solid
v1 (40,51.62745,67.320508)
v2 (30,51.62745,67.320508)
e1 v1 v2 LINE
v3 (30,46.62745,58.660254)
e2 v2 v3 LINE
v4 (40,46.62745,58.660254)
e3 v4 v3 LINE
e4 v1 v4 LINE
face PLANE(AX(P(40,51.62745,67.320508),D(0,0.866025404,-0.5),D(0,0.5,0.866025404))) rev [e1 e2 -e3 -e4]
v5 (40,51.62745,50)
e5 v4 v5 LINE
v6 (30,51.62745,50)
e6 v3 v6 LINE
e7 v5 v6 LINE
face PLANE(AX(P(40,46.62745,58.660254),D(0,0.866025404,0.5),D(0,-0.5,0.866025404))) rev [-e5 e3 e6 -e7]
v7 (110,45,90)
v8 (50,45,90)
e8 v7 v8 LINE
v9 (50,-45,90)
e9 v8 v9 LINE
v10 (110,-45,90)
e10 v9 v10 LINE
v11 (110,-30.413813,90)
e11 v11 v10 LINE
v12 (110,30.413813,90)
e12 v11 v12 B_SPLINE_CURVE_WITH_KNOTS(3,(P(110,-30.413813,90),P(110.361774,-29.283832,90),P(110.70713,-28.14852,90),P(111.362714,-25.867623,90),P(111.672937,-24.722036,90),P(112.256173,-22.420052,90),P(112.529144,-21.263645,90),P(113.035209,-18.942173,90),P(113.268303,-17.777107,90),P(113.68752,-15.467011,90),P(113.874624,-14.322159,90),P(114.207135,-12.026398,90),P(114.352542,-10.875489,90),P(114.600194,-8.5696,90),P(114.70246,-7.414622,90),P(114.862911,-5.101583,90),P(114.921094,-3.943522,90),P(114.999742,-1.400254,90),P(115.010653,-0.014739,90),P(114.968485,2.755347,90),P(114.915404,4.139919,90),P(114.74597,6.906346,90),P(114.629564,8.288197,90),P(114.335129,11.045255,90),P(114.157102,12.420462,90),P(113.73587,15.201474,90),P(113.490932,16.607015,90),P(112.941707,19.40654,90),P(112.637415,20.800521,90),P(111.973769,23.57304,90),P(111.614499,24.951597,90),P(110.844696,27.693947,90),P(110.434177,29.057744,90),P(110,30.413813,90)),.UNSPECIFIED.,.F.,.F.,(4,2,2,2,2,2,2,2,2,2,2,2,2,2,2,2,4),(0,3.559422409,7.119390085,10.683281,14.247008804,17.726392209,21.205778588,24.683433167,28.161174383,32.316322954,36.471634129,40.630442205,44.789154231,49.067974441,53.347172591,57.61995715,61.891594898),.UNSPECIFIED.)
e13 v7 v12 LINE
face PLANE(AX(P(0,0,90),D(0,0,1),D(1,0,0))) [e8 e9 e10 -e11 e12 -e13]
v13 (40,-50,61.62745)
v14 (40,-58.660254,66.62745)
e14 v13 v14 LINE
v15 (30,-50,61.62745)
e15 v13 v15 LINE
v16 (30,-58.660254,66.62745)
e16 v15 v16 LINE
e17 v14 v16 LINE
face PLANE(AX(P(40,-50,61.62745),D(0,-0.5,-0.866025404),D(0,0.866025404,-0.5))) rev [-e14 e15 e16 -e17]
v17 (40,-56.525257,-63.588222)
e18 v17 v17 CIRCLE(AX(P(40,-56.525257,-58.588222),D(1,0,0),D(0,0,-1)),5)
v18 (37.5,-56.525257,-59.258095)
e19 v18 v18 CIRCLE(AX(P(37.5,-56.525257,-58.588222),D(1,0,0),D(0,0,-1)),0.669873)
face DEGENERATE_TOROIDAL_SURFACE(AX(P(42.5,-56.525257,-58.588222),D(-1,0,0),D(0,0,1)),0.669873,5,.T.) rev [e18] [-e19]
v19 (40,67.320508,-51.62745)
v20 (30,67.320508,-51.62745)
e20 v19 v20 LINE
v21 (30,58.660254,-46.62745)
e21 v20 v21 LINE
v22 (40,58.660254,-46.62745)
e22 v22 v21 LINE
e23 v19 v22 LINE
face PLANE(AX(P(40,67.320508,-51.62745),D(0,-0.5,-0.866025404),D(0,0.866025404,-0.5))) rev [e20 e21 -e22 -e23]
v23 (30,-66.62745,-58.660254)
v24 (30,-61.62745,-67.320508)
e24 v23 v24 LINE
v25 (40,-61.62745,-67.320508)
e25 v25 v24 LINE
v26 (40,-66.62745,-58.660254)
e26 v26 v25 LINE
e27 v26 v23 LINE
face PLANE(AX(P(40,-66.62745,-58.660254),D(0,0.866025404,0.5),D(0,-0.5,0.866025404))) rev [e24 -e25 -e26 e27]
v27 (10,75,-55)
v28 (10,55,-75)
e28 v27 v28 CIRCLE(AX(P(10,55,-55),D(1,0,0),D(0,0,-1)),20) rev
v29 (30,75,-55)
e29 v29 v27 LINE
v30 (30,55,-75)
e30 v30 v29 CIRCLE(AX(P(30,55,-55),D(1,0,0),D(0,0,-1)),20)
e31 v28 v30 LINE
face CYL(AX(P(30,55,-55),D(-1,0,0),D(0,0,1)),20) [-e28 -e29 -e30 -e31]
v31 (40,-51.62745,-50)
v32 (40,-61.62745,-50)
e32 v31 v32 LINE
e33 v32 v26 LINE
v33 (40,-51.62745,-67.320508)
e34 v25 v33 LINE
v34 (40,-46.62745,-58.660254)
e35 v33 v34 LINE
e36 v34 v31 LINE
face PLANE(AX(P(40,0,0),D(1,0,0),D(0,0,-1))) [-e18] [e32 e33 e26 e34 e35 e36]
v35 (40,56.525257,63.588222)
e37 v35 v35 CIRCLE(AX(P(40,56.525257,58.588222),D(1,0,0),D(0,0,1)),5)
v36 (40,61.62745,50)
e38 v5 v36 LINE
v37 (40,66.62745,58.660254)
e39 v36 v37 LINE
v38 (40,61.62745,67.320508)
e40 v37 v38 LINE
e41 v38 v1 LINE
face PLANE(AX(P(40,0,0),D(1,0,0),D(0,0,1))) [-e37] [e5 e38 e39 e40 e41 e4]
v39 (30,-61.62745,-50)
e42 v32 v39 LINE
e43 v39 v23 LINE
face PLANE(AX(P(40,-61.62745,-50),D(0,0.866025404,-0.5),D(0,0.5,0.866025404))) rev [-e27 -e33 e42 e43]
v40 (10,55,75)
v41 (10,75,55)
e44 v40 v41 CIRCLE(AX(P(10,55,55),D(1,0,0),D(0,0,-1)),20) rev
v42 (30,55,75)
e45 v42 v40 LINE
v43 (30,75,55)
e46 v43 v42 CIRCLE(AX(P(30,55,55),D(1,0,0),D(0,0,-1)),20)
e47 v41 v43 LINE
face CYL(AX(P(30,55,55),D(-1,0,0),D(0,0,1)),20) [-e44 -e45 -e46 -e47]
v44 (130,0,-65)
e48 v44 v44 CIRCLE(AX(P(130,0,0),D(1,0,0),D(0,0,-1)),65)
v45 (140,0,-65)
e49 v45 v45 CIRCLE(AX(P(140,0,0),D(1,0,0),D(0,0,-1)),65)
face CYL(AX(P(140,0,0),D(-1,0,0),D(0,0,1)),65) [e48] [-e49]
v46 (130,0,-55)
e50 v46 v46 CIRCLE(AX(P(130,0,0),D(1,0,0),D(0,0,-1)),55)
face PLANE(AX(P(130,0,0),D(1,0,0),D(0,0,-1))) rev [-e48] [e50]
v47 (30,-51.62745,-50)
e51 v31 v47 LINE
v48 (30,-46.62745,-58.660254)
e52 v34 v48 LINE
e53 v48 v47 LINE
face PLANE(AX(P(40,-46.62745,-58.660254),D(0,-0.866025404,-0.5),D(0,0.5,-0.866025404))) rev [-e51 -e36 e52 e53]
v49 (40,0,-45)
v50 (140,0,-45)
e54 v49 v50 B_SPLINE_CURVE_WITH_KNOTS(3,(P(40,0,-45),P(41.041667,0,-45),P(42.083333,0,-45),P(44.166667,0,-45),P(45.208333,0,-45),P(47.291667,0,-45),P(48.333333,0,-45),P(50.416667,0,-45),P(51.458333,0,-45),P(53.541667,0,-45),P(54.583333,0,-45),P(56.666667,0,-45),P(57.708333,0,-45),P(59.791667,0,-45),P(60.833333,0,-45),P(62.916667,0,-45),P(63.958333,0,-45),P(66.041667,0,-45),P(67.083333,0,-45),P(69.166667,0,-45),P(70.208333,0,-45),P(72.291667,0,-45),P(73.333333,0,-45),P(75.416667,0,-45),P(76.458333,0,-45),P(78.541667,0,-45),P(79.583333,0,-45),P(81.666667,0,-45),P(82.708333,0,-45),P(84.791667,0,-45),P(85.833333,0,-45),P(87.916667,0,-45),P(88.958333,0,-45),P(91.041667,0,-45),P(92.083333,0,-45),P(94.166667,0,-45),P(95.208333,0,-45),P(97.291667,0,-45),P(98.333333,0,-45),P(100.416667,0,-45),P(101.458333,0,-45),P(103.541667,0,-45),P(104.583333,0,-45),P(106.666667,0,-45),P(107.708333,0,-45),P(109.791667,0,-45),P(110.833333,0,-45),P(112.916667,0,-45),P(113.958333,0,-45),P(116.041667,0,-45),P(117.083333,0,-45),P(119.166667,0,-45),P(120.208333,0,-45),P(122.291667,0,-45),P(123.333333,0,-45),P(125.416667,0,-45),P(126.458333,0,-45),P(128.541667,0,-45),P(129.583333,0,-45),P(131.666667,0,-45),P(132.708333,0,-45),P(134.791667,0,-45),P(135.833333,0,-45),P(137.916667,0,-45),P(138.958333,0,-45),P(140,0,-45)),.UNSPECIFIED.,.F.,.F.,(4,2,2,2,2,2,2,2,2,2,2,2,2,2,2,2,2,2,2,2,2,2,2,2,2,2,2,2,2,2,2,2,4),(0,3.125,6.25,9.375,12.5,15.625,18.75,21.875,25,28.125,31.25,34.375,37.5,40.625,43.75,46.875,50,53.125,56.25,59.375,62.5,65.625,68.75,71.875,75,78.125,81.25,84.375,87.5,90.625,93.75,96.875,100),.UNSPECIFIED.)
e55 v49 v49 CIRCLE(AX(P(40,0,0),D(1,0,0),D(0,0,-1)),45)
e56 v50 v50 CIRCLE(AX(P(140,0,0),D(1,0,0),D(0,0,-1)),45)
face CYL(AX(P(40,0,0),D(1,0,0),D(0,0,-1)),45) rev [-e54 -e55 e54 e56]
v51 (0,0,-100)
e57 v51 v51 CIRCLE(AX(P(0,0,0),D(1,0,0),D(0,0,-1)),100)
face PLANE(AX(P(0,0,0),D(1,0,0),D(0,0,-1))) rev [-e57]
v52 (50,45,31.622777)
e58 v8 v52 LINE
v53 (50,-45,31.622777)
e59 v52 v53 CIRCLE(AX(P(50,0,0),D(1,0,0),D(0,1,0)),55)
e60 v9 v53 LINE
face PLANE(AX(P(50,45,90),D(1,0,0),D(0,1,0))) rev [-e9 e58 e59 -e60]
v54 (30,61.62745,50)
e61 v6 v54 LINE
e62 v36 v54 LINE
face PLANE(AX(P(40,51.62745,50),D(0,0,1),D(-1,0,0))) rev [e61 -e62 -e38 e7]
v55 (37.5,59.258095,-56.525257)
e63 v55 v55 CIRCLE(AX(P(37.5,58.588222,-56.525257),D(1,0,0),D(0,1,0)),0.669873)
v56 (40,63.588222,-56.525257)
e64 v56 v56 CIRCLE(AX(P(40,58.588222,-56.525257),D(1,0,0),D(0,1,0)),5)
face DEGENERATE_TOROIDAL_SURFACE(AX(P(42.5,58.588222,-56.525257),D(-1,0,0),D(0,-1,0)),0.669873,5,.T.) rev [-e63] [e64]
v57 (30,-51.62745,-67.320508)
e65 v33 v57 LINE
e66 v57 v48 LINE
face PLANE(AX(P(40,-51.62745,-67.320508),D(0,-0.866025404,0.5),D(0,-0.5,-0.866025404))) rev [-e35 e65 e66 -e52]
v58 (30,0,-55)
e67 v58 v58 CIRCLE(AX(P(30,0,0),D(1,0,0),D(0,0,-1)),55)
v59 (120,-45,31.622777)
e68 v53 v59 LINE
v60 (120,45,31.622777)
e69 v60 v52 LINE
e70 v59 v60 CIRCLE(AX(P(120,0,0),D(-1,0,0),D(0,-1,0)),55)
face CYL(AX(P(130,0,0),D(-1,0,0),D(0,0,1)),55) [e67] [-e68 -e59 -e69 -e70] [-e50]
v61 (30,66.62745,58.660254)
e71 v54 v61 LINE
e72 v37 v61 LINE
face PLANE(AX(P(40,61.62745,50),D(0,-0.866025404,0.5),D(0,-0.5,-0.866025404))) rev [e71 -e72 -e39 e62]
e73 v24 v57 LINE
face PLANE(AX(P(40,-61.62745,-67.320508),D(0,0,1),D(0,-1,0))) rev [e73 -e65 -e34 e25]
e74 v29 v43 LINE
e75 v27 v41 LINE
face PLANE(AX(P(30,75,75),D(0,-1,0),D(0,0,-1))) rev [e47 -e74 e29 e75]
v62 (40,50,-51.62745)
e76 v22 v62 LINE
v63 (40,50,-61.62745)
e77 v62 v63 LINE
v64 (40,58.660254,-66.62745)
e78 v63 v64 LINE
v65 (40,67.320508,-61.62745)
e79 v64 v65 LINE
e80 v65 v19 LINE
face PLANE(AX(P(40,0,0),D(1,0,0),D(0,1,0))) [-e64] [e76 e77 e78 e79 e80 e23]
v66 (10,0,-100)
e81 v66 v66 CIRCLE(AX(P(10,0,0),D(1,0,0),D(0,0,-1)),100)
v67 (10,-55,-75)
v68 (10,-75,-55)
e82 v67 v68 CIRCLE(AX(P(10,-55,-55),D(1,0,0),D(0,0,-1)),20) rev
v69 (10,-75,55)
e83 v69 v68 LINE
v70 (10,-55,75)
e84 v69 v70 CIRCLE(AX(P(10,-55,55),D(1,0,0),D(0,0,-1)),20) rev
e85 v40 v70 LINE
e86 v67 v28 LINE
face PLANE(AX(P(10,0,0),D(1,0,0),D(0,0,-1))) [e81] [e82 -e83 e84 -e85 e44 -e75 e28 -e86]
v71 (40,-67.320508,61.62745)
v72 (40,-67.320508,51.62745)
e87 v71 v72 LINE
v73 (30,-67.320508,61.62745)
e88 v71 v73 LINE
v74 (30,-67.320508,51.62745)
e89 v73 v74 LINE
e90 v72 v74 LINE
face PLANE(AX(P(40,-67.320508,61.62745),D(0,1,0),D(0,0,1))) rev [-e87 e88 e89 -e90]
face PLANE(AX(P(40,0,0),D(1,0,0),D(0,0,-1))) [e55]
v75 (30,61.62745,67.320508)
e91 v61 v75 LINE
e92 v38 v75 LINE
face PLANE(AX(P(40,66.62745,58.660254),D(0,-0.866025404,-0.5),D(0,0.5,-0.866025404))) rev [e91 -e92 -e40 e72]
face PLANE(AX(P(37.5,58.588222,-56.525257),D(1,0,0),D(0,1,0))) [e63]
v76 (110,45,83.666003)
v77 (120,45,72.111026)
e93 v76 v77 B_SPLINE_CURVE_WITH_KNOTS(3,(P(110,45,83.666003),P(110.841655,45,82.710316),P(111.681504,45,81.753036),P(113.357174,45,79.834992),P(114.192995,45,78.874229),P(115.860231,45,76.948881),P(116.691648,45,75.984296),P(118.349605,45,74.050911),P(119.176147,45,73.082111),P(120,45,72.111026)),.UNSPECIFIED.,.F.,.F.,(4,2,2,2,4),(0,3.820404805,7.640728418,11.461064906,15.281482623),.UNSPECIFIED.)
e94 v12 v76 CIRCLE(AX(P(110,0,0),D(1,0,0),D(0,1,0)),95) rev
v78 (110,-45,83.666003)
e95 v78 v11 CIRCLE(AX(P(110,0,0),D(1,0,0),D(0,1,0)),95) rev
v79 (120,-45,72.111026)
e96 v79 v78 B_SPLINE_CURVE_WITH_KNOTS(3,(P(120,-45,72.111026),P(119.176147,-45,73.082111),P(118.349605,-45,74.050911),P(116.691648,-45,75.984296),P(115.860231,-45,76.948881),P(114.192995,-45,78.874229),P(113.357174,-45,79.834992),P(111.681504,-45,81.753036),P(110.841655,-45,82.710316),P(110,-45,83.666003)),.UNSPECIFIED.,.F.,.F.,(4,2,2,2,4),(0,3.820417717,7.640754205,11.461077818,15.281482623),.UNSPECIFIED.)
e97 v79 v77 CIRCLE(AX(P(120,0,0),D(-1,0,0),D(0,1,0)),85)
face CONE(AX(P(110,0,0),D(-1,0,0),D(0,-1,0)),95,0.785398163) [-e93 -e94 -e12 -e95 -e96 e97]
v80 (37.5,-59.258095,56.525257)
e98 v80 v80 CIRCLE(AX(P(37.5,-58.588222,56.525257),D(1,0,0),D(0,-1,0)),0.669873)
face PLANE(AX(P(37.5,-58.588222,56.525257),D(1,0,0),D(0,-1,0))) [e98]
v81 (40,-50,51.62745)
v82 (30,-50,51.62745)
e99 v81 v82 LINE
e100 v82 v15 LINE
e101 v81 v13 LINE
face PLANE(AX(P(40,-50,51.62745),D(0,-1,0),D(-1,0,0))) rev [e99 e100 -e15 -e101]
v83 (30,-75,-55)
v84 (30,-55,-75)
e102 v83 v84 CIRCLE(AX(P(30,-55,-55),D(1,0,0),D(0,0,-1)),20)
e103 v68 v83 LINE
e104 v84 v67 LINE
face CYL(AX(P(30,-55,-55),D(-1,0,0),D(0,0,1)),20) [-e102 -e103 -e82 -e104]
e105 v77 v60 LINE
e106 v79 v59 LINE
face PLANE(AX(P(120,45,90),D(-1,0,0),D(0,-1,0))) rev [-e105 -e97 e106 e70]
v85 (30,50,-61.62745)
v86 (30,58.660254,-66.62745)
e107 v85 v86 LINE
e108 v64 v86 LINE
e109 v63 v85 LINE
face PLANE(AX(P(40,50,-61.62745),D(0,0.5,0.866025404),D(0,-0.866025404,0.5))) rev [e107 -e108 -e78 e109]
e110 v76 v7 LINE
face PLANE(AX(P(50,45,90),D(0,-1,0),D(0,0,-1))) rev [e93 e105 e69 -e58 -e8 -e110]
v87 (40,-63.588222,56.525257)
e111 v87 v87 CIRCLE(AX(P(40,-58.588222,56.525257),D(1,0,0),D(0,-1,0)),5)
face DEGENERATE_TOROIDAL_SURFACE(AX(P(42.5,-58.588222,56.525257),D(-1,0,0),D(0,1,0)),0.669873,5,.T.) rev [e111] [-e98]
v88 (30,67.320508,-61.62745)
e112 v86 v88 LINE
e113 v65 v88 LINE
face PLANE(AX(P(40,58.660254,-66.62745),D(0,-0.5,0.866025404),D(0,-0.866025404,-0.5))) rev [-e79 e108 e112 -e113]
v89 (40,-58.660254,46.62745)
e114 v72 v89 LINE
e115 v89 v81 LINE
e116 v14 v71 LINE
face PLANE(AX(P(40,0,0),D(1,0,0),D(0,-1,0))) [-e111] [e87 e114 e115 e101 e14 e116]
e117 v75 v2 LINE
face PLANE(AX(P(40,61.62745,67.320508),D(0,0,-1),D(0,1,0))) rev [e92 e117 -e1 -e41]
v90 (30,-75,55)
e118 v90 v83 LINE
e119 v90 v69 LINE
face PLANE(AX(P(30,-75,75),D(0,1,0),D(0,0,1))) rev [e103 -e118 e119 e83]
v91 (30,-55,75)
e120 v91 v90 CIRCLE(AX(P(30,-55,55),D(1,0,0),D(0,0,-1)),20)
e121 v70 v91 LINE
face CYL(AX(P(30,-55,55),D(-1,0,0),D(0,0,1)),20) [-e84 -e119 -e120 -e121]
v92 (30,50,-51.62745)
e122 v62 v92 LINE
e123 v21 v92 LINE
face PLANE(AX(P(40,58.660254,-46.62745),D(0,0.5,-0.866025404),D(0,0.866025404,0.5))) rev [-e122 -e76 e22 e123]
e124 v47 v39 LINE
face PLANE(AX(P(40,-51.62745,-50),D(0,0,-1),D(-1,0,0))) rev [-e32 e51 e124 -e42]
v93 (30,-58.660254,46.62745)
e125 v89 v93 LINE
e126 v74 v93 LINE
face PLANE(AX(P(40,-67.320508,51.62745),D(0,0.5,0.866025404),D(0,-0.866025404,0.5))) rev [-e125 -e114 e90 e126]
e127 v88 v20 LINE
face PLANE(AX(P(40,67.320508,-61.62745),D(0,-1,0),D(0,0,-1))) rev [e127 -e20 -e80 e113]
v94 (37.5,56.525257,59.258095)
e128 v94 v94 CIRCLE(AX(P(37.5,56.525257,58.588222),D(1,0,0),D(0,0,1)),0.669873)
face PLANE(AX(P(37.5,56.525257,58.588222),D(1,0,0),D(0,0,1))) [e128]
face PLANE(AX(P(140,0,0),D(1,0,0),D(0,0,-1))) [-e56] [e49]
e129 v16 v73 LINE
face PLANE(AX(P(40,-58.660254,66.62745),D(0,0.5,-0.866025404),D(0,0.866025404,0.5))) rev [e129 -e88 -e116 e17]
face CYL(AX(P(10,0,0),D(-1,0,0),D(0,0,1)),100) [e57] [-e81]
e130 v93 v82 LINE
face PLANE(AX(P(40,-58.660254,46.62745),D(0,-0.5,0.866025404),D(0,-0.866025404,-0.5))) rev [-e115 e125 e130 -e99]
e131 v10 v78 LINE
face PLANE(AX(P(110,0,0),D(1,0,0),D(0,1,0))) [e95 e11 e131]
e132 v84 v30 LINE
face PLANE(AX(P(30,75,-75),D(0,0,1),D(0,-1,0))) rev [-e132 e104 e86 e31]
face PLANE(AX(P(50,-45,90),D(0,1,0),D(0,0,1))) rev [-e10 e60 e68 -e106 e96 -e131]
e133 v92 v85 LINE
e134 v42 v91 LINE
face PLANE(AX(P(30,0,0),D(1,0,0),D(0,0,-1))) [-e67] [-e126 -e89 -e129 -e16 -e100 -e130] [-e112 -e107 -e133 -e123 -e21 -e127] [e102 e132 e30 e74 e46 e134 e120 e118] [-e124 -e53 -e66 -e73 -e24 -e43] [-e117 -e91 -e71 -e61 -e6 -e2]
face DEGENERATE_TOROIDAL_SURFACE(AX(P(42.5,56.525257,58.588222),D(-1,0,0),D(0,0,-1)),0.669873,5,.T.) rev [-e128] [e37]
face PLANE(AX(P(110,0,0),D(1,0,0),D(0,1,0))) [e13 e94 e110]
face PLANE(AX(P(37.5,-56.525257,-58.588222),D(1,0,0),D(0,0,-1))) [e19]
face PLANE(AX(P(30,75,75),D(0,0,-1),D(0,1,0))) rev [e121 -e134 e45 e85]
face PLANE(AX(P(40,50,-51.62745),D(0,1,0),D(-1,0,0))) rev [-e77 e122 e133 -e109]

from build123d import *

# Parameters (mm, degrees)
SKETCH1_R                = 100
BOSS_EXTRUDE1_DEPTH      = 10
SKETCH2_W                = 150
SKETCH2_H                = 150
BOSS_EXTRUDE2_DEPTH      = 20
FILLET1_R                = 20
SKETCH3_R                = 55
BOSS_EXTRUDE3_DEPTH      = 100
SKETCH4_R                = 65
BOSS_EXTRUDE4_DEPTH      = 10
SKETCH5_W                = 70
SKETCH5_H                = 90
BOSS_EXTRUDE5_DEPTH      = 90
CUT_EXTRUDE1_DEPTH       = 10
CHAMFER1_SIZE            = 10
SKETCH7_R                = 45
CUT_EXTRUDE2_DEPTH       = 100
BOSS_EXTRUDE6_DEPTH      = 10
SKETCH9_R                = 5
CUT_EXTRUDE3_DEPTH       = 2.5
FILLET9_R                = 5
CIRPATTERN1_COUNT        = 4
FILLET9_OF_CIRPATTERN1_R = 5


with BuildPart() as part:
    # Sketch1 → Boss-Extrude1 (new body)
    with BuildSketch(Plane(origin=(0, 0, 0), x_dir=(0, 0, -1), z_dir=(1, 0, 0))):
        Circle(SKETCH1_R)
    extrude(amount=BOSS_EXTRUDE1_DEPTH)

    # Sketch2 → Boss-Extrude2 (add)
    with BuildSketch(Plane(origin=(10, 0, 0), x_dir=(0, 0, -1), z_dir=(1, 0, 0))):
        Rectangle(SKETCH2_W, SKETCH2_H)
    extrude(amount=BOSS_EXTRUDE2_DEPTH)

    # Fillet1
    # the kernel refuses this fillet: 20 mm, written as the material it takes off along each edge
    with BuildSketch(Plane(origin=(10, -75, -75), x_dir=(0, 1, 0), z_dir=(1, 0, 0)), Plane(origin=(10, 75, 75), x_dir=(0, -1, 0), z_dir=(1, 0, 0)), Plane(origin=(10, -75, 75), x_dir=(0, 0, -1), z_dir=(1, 0, 0))) as fillet1_piece_1:
        with BuildLine():
            CenterArc((FILLET1_R, FILLET1_R), FILLET1_R, 180, 90)
            Line((0, FILLET1_R), (0, 0))
            Line((0, 0), (FILLET1_R, 0))
        make_face()
    extrude(amount=70, mode=Mode.SUBTRACT)
    with BuildSketch(Plane(origin=(10, 75, -75), x_dir=(0, -1, 0), z_dir=(1, 0, 0))) as fillet1_piece_2:
        with BuildLine():
            CenterArc((FILLET1_R, -FILLET1_R), FILLET1_R, 90, 90)
            Line((0, -FILLET1_R), (0, 0))
            Line((0, 0), (FILLET1_R, 0))
        make_face()
    extrude(amount=70, mode=Mode.SUBTRACT)

    # Sketch3 → Boss-Extrude3 (add)
    with BuildSketch(Plane(origin=(30, 0, 0), x_dir=(0, 0, -1), z_dir=(1, 0, 0))):
        with Locations(Location((0, 0, 0), (0, 0, 180))):
            Circle(SKETCH3_R)
    extrude(amount=BOSS_EXTRUDE3_DEPTH)

    # Sketch4 → Boss-Extrude4 (add)
    with BuildSketch(Plane(origin=(130, 0, 0), x_dir=(0, 0, -1), z_dir=(1, 0, 0))):
        Circle(SKETCH4_R)
    extrude(amount=BOSS_EXTRUDE4_DEPTH)

    # Sketch5 → Boss-Extrude5 (add)
    with BuildSketch(Plane.XY):
        with Locations((85, 0)):
            Rectangle(SKETCH5_W, SKETCH5_H)
    extrude(amount=BOSS_EXTRUDE5_DEPTH)

    # Sketch6 → Cut-Extrude1 (cut)
    with BuildSketch(Plane(origin=(120, 0, 0), x_dir=(0, 0, -1), z_dir=(1, 0, 0))):
        with BuildLine():
            Line((-90, -45), (-72.111025509, -45))
            ThreePointArc((-72.111025509, -45), (-85, 0), (-72.111025509, 45))
            Line((-72.111025509, 45), (-90, 45))
            Line((-90, 45), (-90, -45))
        make_face()
    extrude(amount=-CUT_EXTRUDE1_DEPTH, mode=Mode.SUBTRACT)

    # Chamfer1
    # the kernel refuses this chamfer: 10 mm, written as the material it adds along each edge
    with BuildSketch(Plane(origin=(110, 0, 0), x_dir=(0, -0.7581812704151473, 0.6520438337962206), z_dir=(0, -0.6520438337962206, -0.7581812704151473))) as chamfer1_piece_1_section:
        Polygon((85, -CHAMFER1_SIZE), (85 + CHAMFER1_SIZE, 0), (85, 0), align=None)
    chamfer1_piece_1 = revolve(axis=Axis((110, 0, 0), (-1, 0, 0)), revolution_arc=98.608247973, mode=Mode.PRIVATE)
    chamfer1_piece_1 = split(chamfer1_piece_1, bisect_by=Plane(origin=(118.167671654, 45, 80.674313719), z_dir=(0, -1, 0)), keep=Keep.TOP, mode=Mode.PRIVATE)
    chamfer1_piece_1 = split(chamfer1_piece_1, bisect_by=Plane(origin=(120, -31.470599687, 80.674313719), z_dir=(-1, 0, 0)), keep=Keep.TOP, mode=Mode.PRIVATE)
    chamfer1_piece_1 = split(chamfer1_piece_1, bisect_by=Plane(origin=(118.167671654, -45, 80.674313719), z_dir=(0, 1, 0)), keep=Keep.TOP, mode=Mode.PRIVATE)
    chamfer1_piece_1 = split(chamfer1_piece_1, bisect_by=Plane(origin=(118.167671654, -31.470599687, 90), z_dir=(0, 0, -1)), keep=Keep.TOP, mode=Mode.PRIVATE)
    add(chamfer1_piece_1)

    # Sketch7 → Cut-Extrude2 (cut)
    with BuildSketch(Plane(origin=(140, 0, 0), x_dir=(0, 0, -1), z_dir=(1, 0, 0))):
        Circle(SKETCH7_R)
    extrude(amount=-CUT_EXTRUDE2_DEPTH, mode=Mode.SUBTRACT)

    # Sketch8 → Boss-Extrude6 (add)
    with BuildSketch(Plane(origin=(30, 0, 0), x_dir=(0, 0, -1), z_dir=(1, 0, 0))):
        Polygon((67.320508076, -61.627449546), (67.320508076, -51.627449546), (58.660254038, -46.627449546), (50, -51.627449546), (50, -61.627449546), (58.660254038, -66.627449546), align=None)
    boss_extrude6 = extrude(amount=BOSS_EXTRUDE6_DEPTH)

    # Sketch9 → Cut-Extrude3 (cut)
    with BuildSketch(Plane(origin=(40, 0, 0), x_dir=(0, 0, -1), z_dir=(1, 0, 0))):
        with Locations((58.588222401, -56.525256823)):
            Circle(SKETCH9_R)
    cut_extrude3 = extrude(amount=-CUT_EXTRUDE3_DEPTH, mode=Mode.SUBTRACT)

    # Fillet9
    # the kernel refuses this fillet: 5 mm, written as the material it adds along each edge
    with BuildSketch(Plane(origin=(37.5, -56.525256823, -58.588222401), x_dir=(0, 0, -1), z_dir=(0, -1, 0))) as fillet9_piece_1:
        with BuildLine():
            CenterArc((0.669872981, 5), FILLET9_R, 270, 60)
            Line((0.669872981, 0), (0.669872981, -0.1))
            Line((0.669872981, -0.1), (5, -0.1))
            Line((5, -0.1), (5.1, 0))
            ThreePointArc((5.1, 0), (5.1, 1.25), (5.08660254, 2.45))
            Line((5.08660254, 2.45), (5, 2.5))
        make_face()
    revolve(axis=Axis((37.5, -56.525256823, -58.588222401), (1, 0, 0)))

    # CirPattern1: Boss-Extrude6, Cut-Extrude3 ×4 about axis
    cirpattern1_axis = Axis((0, 0, 0), (1, 0, 0))
    add([boss_extrude6.rotate(cirpattern1_axis, i * 360 / CIRPATTERN1_COUNT) for i in range(1, CIRPATTERN1_COUNT)])
    add([cut_extrude3.rotate(cirpattern1_axis, i * 360 / CIRPATTERN1_COUNT) for i in range(1, CIRPATTERN1_COUNT)], mode=Mode.SUBTRACT)

    # Fillet9 of CirPattern1
    # the kernel refuses this fillet: 5 mm, written as the material it adds along each edge
    with BuildSketch(Plane(origin=(37.5, 58.588222401, -56.525256823), x_dir=(0, 1, 0), z_dir=(0, 0, -1))) as fillet9_of_cirpattern1_piece_1:
        with BuildLine():
            CenterArc((0.669872981, 5), FILLET9_OF_CIRPATTERN1_R, 270, 60)
            Line((0.669872981, 0), (0.669872981, -0.1))
            Line((0.669872981, -0.1), (5, -0.1))
            Line((5, -0.1), (5.1, 0))
            ThreePointArc((5.1, 0), (5.1, 1.25), (5.08660254, 2.45))
            Line((5.08660254, 2.45), (5, 2.5))
        make_face()
    revolve(axis=Axis((37.5, 58.588222401, -56.525256823), (1, 0, 0)))
    with BuildSketch(Plane(origin=(37.5, 56.525256823, 58.588222401), x_dir=(0, 0, 1), z_dir=(0, 1, 0))) as fillet9_of_cirpattern1_piece_2:
        with BuildLine():
            CenterArc((0.669872981, 5), FILLET9_OF_CIRPATTERN1_R, 270, 60)
            Line((0.669872981, 0), (0.669872981, -0.1))
            Line((0.669872981, -0.1), (5, -0.1))
            Line((5, -0.1), (5.1, 0))
            ThreePointArc((5.1, 0), (5.1, 1.25), (5.08660254, 2.45))
            Line((5.08660254, 2.45), (5, 2.5))
        make_face()
    revolve(axis=Axis((37.5, 56.525256823, 58.588222401), (1, 0, 0)))
    with BuildSketch(Plane(origin=(37.5, -58.588222401, 56.525256823), x_dir=(0, -1, 0), z_dir=(0, 0, 1))) as fillet9_of_cirpattern1_piece_3:
        with BuildLine():
            CenterArc((0.669872981, 5), FILLET9_OF_CIRPATTERN1_R, 270, 60)
            Line((0.669872981, 0), (0.669872981, -0.1))
            Line((0.669872981, -0.1), (5, -0.1))
            Line((5, -0.1), (5.1, 0))
            ThreePointArc((5.1, 0), (5.1, 1.25), (5.08660254, 2.45))
            Line((5.08660254, 2.45), (5, 2.5))
        make_face()
    revolve(axis=Axis((37.5, -58.588222401, 56.525256823), (1, 0, 0)))


solid = part.part
